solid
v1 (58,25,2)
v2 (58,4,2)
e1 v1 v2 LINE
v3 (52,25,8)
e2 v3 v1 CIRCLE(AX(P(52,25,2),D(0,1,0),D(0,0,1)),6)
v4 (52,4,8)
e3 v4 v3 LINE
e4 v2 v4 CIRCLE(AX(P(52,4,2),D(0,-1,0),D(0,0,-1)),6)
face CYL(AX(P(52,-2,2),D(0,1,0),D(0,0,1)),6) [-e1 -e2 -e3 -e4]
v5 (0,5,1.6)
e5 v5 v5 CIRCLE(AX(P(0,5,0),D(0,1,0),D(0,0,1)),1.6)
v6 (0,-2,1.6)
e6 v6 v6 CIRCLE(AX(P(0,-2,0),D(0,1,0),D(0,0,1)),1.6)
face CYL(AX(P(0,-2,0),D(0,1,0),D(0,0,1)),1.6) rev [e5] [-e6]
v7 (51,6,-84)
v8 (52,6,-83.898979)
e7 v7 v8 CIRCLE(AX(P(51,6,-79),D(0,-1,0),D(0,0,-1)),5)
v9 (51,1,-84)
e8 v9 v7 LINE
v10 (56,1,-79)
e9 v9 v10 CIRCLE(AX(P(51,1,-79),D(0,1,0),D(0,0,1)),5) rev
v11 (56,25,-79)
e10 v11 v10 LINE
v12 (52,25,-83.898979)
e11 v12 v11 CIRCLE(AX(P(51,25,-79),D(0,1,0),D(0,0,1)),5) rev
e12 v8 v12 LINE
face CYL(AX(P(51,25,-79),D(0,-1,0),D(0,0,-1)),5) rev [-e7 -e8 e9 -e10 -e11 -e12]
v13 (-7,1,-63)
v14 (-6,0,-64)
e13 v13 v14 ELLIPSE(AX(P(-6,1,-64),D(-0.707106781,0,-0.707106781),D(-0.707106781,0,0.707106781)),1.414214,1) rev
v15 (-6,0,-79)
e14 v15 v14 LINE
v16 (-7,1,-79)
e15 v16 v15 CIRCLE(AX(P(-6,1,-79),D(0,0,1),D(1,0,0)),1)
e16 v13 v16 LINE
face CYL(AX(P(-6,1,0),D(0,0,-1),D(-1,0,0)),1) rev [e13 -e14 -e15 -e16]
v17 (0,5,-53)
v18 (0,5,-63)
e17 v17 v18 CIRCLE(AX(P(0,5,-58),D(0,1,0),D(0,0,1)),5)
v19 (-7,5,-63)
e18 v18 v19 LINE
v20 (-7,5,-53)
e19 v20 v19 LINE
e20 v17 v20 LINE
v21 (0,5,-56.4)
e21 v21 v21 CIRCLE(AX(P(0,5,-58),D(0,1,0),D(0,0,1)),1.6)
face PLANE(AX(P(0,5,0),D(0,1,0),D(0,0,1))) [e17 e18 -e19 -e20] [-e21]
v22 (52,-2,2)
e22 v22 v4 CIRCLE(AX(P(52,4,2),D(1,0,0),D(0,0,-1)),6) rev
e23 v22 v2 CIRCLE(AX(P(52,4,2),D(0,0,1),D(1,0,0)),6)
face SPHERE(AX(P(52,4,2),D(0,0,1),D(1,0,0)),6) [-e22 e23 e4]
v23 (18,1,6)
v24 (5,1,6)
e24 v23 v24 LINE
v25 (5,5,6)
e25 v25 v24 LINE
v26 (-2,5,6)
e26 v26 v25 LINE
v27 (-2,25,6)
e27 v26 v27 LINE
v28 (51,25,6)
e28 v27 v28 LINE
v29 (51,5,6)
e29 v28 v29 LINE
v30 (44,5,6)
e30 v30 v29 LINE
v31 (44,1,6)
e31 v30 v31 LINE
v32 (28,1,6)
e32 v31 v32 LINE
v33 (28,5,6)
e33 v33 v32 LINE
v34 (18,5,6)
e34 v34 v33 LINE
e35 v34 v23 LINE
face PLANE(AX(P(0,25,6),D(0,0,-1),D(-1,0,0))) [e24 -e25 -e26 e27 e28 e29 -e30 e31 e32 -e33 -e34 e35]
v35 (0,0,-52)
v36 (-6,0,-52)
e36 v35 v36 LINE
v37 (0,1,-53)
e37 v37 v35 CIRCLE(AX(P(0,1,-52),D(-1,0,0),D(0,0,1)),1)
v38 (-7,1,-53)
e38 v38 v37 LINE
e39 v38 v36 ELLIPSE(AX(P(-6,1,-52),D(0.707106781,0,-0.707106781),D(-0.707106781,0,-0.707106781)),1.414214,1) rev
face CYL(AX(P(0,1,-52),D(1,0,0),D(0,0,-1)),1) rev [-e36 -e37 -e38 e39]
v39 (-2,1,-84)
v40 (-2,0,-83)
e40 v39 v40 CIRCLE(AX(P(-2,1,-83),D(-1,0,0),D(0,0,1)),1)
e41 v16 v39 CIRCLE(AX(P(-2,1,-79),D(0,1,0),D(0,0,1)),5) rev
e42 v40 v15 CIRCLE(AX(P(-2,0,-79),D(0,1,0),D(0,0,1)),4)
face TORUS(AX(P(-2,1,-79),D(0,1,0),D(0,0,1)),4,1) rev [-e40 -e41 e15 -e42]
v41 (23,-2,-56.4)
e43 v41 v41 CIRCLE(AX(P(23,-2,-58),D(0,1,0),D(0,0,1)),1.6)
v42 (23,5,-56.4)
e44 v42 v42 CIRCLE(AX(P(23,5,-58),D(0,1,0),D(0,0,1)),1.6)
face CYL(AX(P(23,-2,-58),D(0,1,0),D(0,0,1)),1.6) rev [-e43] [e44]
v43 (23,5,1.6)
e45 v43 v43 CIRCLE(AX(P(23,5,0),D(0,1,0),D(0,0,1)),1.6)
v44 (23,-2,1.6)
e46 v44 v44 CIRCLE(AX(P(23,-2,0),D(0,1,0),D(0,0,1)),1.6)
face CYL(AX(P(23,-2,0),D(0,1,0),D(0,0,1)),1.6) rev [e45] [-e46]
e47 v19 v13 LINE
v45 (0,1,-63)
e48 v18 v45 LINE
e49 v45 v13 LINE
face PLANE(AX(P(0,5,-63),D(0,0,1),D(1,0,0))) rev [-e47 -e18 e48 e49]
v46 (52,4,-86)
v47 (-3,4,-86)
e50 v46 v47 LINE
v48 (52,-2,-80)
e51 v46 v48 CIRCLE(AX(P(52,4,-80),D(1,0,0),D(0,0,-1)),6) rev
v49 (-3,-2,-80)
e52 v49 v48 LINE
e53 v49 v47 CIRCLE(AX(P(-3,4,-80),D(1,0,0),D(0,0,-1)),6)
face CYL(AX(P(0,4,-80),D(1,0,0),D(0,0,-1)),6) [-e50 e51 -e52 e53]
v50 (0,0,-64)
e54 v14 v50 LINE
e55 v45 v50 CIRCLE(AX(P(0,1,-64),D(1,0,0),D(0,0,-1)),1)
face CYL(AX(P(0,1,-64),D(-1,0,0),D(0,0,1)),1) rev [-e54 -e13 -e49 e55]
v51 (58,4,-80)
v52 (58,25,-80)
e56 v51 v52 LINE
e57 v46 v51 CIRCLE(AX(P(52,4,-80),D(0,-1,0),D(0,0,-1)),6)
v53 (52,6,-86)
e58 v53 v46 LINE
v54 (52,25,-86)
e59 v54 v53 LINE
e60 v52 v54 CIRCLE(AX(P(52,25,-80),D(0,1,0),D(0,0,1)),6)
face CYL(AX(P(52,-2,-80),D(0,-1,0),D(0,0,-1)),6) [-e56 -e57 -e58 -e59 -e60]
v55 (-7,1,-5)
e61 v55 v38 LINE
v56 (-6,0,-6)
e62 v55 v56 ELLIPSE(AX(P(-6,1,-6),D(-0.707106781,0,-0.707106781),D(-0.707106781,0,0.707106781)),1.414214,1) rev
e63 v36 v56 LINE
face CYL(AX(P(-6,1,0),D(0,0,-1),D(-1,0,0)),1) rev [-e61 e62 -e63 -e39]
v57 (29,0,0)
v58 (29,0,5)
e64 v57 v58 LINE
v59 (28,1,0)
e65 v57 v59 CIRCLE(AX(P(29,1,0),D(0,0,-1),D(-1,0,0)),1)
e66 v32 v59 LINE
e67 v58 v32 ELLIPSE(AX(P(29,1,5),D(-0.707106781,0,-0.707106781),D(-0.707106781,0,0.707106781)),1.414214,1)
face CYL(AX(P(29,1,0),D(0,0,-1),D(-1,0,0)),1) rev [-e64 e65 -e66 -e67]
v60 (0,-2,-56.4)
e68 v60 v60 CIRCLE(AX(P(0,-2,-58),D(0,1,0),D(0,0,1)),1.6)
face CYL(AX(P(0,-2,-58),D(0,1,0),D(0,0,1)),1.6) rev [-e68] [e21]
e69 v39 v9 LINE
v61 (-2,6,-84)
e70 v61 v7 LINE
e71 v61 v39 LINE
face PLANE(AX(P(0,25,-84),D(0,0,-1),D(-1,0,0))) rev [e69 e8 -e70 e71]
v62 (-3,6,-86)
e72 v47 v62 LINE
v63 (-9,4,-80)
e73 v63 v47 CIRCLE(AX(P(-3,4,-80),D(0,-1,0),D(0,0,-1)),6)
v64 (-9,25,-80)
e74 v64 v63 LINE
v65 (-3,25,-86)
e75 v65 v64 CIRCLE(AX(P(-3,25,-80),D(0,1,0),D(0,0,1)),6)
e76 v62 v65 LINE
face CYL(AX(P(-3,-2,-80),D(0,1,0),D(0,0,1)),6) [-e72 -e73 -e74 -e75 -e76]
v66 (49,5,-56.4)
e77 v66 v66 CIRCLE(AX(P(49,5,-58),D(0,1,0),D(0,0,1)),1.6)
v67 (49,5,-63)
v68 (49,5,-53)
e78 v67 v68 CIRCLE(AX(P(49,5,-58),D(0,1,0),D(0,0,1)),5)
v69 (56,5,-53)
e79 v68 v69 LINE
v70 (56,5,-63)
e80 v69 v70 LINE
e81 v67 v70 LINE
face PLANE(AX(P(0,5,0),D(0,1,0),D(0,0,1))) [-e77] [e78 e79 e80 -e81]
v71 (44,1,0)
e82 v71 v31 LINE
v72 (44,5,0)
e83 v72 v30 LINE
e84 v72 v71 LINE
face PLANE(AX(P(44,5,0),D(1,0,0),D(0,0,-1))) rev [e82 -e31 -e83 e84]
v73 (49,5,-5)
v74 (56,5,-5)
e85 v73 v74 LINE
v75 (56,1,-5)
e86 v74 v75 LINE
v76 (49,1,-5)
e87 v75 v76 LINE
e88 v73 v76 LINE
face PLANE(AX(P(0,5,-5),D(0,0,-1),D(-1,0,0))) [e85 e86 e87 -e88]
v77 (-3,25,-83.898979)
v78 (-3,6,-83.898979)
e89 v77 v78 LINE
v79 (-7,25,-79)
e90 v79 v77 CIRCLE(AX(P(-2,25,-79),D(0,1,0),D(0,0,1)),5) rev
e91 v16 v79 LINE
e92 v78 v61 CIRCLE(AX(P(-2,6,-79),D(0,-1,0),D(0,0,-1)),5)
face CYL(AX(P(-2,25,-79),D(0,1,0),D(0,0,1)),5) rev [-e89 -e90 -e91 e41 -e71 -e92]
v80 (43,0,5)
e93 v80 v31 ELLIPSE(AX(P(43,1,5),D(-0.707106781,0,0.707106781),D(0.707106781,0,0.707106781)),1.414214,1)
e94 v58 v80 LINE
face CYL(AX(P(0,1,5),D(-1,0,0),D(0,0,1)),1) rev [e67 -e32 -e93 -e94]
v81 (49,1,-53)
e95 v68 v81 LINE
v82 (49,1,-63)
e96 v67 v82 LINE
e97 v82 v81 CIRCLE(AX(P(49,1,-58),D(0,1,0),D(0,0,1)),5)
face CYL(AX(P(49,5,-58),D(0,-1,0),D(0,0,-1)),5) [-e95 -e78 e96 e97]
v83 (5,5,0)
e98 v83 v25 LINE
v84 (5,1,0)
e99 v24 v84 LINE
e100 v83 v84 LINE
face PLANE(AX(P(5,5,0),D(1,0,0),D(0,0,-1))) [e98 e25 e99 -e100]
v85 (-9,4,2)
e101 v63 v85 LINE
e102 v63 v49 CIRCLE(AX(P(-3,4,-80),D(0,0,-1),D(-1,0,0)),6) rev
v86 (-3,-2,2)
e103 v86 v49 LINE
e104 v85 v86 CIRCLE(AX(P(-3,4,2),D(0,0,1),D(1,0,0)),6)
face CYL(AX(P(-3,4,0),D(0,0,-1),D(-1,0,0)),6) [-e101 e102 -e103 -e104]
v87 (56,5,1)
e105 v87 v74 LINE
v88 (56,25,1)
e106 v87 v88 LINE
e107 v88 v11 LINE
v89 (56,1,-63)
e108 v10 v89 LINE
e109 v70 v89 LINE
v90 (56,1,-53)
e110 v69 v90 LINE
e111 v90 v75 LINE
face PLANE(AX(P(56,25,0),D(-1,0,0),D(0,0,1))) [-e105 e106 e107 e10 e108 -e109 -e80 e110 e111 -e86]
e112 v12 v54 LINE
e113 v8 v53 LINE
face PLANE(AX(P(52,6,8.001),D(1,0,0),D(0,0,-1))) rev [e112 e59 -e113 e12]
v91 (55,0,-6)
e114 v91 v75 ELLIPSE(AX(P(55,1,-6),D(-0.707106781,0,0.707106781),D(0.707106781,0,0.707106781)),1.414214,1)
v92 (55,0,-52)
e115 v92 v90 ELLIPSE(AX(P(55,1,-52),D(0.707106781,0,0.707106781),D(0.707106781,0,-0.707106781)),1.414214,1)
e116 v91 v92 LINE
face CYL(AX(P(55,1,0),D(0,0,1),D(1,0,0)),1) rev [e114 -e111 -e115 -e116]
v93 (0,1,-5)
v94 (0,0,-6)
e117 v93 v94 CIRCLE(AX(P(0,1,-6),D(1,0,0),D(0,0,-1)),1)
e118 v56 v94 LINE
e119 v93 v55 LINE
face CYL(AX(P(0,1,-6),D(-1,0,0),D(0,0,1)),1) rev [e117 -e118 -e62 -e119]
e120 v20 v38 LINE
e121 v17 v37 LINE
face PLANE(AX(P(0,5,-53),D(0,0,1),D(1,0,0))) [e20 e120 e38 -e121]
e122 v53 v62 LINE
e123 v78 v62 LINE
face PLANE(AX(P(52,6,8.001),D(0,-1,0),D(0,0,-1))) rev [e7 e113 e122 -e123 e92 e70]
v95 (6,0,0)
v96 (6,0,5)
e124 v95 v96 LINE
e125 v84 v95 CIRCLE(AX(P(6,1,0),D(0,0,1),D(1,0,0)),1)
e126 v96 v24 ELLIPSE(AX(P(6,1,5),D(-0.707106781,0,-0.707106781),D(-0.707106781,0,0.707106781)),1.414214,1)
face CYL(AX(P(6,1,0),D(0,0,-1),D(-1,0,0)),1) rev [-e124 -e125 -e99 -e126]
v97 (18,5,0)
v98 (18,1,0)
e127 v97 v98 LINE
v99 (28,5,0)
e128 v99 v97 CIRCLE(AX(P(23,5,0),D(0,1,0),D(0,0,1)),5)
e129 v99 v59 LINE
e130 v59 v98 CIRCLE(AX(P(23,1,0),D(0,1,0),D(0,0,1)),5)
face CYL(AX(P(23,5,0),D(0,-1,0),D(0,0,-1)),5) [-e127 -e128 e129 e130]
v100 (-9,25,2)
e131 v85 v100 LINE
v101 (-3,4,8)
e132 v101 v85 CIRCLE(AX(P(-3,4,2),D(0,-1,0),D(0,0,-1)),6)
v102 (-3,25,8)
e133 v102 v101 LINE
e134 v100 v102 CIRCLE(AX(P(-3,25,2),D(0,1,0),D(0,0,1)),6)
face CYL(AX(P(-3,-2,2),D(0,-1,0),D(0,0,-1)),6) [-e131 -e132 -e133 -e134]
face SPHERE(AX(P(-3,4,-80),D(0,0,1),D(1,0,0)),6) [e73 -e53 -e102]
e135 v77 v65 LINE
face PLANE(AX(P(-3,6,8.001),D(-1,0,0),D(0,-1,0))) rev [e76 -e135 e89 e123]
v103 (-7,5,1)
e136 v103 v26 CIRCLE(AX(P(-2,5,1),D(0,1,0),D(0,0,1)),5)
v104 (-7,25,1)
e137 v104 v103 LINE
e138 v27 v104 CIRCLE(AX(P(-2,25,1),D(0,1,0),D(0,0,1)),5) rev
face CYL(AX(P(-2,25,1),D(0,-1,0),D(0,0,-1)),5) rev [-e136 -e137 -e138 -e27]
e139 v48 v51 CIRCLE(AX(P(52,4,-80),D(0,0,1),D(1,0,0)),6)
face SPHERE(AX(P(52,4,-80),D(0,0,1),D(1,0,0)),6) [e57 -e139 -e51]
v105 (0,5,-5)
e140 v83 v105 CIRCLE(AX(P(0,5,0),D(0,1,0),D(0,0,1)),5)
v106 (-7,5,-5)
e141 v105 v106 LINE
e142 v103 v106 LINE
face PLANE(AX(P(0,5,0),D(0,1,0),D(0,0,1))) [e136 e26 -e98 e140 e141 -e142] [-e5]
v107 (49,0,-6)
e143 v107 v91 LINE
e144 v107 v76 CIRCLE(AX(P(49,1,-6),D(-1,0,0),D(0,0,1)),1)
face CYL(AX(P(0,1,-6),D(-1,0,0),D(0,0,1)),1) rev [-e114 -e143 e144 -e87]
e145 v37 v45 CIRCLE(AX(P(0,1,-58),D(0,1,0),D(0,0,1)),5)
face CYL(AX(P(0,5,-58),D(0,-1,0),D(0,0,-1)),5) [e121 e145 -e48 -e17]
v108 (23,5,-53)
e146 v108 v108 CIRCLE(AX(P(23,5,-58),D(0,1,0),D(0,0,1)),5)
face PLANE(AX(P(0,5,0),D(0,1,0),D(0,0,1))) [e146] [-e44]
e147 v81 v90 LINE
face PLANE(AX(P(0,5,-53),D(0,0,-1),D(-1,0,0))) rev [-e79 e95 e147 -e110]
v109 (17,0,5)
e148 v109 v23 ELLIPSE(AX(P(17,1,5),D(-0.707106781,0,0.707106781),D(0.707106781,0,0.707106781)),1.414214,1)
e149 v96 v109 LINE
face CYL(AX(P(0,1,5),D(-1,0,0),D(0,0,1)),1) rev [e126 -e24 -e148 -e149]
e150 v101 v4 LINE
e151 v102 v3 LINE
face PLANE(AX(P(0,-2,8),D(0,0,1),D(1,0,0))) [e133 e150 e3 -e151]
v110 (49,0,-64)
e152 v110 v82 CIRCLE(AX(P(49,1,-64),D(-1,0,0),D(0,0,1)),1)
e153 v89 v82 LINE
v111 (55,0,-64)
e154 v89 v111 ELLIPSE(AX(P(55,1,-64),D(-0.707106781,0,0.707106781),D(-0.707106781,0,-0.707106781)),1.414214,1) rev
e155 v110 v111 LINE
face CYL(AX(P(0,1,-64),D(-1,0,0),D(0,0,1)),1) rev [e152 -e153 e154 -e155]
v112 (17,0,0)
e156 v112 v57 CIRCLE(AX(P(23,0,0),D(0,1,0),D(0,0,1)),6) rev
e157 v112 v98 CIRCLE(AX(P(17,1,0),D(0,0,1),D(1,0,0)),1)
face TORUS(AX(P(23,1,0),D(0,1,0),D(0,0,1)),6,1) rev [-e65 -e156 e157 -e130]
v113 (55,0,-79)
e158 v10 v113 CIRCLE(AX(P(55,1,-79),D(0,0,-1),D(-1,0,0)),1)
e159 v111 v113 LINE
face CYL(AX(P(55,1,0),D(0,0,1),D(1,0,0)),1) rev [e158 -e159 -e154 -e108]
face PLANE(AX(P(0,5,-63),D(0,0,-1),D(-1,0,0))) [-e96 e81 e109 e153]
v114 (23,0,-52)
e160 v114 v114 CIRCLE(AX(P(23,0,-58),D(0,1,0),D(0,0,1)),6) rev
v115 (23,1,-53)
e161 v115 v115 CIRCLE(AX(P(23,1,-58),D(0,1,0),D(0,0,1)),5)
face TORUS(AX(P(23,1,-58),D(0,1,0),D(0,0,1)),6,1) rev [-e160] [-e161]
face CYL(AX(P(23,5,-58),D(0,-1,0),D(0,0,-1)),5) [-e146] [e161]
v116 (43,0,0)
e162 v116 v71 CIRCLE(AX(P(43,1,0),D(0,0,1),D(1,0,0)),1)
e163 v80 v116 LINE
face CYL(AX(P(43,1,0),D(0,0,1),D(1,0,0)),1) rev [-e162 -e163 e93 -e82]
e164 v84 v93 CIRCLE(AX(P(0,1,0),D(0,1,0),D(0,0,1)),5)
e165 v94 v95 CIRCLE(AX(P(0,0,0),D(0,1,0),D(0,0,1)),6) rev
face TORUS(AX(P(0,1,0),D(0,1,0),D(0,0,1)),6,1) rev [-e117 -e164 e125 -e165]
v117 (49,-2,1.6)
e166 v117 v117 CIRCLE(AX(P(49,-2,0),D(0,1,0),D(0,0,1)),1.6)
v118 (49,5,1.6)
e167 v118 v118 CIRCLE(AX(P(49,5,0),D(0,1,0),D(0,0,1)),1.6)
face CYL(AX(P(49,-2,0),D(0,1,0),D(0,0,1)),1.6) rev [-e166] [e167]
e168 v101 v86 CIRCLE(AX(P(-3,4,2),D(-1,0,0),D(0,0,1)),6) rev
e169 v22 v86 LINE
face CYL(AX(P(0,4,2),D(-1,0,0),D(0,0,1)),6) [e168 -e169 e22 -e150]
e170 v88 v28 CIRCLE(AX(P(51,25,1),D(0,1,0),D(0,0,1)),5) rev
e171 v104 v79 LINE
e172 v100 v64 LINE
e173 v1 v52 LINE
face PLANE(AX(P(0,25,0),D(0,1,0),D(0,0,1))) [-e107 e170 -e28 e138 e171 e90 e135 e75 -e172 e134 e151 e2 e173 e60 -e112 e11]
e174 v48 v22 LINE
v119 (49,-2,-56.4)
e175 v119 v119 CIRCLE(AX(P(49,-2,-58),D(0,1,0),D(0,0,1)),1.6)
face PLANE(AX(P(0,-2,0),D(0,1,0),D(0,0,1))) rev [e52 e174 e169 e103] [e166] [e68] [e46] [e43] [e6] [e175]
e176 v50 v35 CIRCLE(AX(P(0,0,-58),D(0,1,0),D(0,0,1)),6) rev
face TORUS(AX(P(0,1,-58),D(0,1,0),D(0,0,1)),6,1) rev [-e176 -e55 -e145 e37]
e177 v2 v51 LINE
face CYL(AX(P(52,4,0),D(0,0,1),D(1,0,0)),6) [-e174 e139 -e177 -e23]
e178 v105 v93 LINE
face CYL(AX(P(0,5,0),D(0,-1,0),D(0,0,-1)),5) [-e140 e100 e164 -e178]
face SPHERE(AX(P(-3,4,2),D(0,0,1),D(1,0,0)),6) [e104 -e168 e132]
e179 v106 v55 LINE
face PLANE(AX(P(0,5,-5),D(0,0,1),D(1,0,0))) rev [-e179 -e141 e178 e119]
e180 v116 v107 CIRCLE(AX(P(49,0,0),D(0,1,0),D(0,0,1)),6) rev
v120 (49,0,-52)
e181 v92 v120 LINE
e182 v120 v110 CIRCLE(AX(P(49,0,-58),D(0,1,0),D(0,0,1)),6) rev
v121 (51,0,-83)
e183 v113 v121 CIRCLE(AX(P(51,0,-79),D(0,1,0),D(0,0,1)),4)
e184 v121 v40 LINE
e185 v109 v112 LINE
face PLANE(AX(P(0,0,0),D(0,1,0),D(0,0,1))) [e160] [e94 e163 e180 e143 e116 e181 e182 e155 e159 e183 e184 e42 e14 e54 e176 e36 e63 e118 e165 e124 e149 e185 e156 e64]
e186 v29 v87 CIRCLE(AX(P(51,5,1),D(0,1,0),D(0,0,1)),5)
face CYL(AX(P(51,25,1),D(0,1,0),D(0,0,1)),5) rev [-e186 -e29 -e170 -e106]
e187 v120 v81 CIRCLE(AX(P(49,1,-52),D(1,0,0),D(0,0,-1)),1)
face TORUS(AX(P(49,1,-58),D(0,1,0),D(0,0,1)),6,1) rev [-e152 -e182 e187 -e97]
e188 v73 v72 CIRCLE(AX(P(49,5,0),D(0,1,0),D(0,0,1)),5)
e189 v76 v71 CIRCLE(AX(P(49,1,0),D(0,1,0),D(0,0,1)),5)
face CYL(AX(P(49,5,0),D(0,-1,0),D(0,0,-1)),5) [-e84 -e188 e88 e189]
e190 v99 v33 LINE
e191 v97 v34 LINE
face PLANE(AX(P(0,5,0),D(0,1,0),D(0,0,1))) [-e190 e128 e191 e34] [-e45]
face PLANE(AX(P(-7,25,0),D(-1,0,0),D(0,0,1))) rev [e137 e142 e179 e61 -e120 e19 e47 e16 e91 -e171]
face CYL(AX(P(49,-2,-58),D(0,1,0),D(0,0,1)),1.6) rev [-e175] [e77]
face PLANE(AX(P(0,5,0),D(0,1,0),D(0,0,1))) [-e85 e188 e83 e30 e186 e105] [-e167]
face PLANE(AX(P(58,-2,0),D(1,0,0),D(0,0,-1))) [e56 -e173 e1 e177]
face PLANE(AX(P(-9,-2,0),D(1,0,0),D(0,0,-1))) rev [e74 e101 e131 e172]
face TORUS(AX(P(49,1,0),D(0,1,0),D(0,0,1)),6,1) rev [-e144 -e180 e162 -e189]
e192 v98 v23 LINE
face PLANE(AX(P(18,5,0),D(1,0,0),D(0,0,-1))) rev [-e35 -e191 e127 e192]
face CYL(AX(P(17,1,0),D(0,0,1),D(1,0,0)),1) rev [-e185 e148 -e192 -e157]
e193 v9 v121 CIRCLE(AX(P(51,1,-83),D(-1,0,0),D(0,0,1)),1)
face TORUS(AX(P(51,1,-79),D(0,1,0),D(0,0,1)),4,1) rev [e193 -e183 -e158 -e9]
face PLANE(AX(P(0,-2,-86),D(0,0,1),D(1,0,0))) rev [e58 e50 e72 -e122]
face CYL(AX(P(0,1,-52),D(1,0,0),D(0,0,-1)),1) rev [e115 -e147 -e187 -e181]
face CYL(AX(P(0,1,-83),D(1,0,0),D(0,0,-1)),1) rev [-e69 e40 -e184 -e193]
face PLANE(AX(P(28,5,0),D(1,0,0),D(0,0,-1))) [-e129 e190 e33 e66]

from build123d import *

# Parameters (mm, degrees)
SKETCH_1_W          = 67
SKETCH_1_H          = 94
SKETCH_1_R          = 1.6
EXTRUDE_1_DEPTH     = 2
SKETCH_1_3_W        = 67
SKETCH_1_3_H        = 94
SKETCH_1_3_W_2      = 63
SKETCH_1_3_H_2      = 90
EXTRUDE_2_DEPTH     = 25
EXTRUDE_START       = 5
SKETCH_1_4_R        = 1.6
SKETCH_1_4_R_2      = 5
EXTRUDE_3_DEPTH     = 5
CUT_EXTRUDE_1_REACH = 115.248
SKETCH_2_W          = 55
SKETCH_2_H          = 19
FILLET_7_R          = 5
FILLET_8_R          = 1
FILLET_9_R          = 6
FILLET_11_R         = 6


with BuildPart() as part:
    # Эскиз1 → Бобышка-Вытянуть1 (new body)
    with BuildSketch(Plane(origin=(0, 0, 0), x_dir=(1, 0, 0), z_dir=(0, 1, 0))):
        with Locations((24.5, 39)):
            Rectangle(SKETCH_1_W, SKETCH_1_H)
        with Locations(Location((0, 0, 0), (0, 0, 270))):
            Circle(SKETCH_1_R, mode=Mode.SUBTRACT)
        with Locations(Location((49, 0, 0), (0, 0, 270))):
            Circle(SKETCH_1_R, mode=Mode.SUBTRACT)
        with Locations(Location((49, 58, 0), (0, 0, 270))):
            Circle(SKETCH_1_R, mode=Mode.SUBTRACT)
        with Locations(Location((0, 58, 0), (0, 0, 270))):
            Circle(SKETCH_1_R, mode=Mode.SUBTRACT)
        with Locations(Location((23, 58, 0), (0, 0, 270))):
            Circle(SKETCH_1_R, mode=Mode.SUBTRACT)
        with Locations(Location((23, 0, 0), (0, 0, 270))):
            Circle(SKETCH_1_R, mode=Mode.SUBTRACT)
    extrude(amount=-EXTRUDE_1_DEPTH)

    # Эскиз1<3> → Бобышка-Вытянуть2 (add)
    with BuildSketch(Plane(origin=(0, 0, 0), x_dir=(1, 0, 0), z_dir=(0, 1, 0))):
        with Locations((24.5, 39)):
            Rectangle(SKETCH_1_3_W, SKETCH_1_3_H)
        with Locations((24.5, 39)):
            Rectangle(SKETCH_1_3_W_2, SKETCH_1_3_H_2, mode=Mode.SUBTRACT)
    extrude(amount=EXTRUDE_2_DEPTH)

    # Эскиз1<4> → Бобышка-Вытянуть3 (add)
    # profile 1 of 6: a face of its own
    with BuildSketch(Plane(origin=(0, 0, 0), x_dir=(1, 0, 0), z_dir=(0, 1, 0)).offset(EXTRUDE_START)):
        with BuildLine():
            Line((-7, 5), (-7, -6))
            Line((-7, -6), (5, -6))
            Line((5, -6), (5, 0))
            ThreePointArc((5, 0), (3.535533906, 3.535533906), (0, 5))
            Line((0, 5), (-7, 5))
        make_face()
        with Locations(Location((0, 0, 0), (0, 0, 270))):
            Circle(SKETCH_1_4_R, mode=Mode.SUBTRACT)
    # profile 2 of 6: a face of its own
    with BuildSketch(Plane(origin=(0, 0, 0), x_dir=(1, 0, 0), z_dir=(0, 1, 0)).offset(EXTRUDE_START)):
        with BuildLine():
            Line((18, 0), (18, -6))
            Line((18, -6), (28, -6))
            Line((28, -6), (28, 0))
            ThreePointArc((28, 0), (23, 5), (18, 0))
        make_face()
        with Locations(Location((23, 0, 0), (0, 0, 270))):
            Circle(SKETCH_1_4_R, mode=Mode.SUBTRACT)
    # profile 3 of 6: a face of its own
    with BuildSketch(Plane(origin=(0, 0, 0), x_dir=(1, 0, 0), z_dir=(0, 1, 0)).offset(EXTRUDE_START)):
        with BuildLine():
            Line((-7, 63), (-7, 53))
            Line((-7, 53), (0, 53))
            ThreePointArc((0, 53), (5, 58), (0, 63))
            Line((0, 63), (-7, 63))
        make_face()
        with Locations(Location((0, 58, 0), (0, 0, 270))):
            Circle(SKETCH_1_4_R, mode=Mode.SUBTRACT)
    # profile 4 of 6: a face of its own
    with BuildSketch(Plane(origin=(0, 0, 0), x_dir=(1, 0, 0), z_dir=(0, 1, 0)).offset(EXTRUDE_START)):
        with BuildLine():
            Line((44, 0), (44, -6))
            Line((44, -6), (56, -6))
            Line((56, -6), (56, 5))
            Line((56, 5), (49, 5))
            ThreePointArc((49, 5), (45.464466094, 3.535533906), (44, 0))
        make_face()
        with Locations(Location((49, 0, 0), (0, 0, 270))):
            Circle(SKETCH_1_4_R, mode=Mode.SUBTRACT)
    # profile 5 of 6: a face of its own
    with BuildSketch(Plane(origin=(0, 0, 0), x_dir=(1, 0, 0), z_dir=(0, 1, 0)).offset(EXTRUDE_START)):
        with BuildLine():
            Line((56, 53), (56, 63))
            Line((56, 63), (49, 63))
            ThreePointArc((49, 63), (44, 58), (49, 53))
            Line((49, 53), (56, 53))
        make_face()
        with Locations(Location((49, 58, 0), (0, 0, 270))):
            Circle(SKETCH_1_4_R, mode=Mode.SUBTRACT)
    # profile 6 of 6: a face of its own
    with BuildSketch(Plane(origin=(0, 0, 0), x_dir=(1, 0, 0), z_dir=(0, 1, 0)).offset(EXTRUDE_START)):
        with Locations(Location((23, 58, 0), (0, 0, 270))):
            Circle(SKETCH_1_4_R_2)
        with Locations(Location((23, 58, 0), (0, 0, 270))):
            Circle(SKETCH_1_4_R, mode=Mode.SUBTRACT)
    extrude(amount=-EXTRUDE_3_DEPTH)

    # Эскиз2 → Вырез-Вытянуть1 (cut, up to next)
    with BuildSketch(Plane(origin=(0, 0, -86), x_dir=(-1, 0, 0), z_dir=(0, 0, -1)), mode=Mode.PRIVATE) as cut_extrude_1_sk1:
        with Locations((-24.5, 15.5)):
            Rectangle(SKETCH_2_W, SKETCH_2_H)
    cut_extrude_1_tool1 = extrude(cut_extrude_1_sk1.sketch, amount=-CUT_EXTRUDE_1_REACH, mode=Mode.PRIVATE) & part.part
    add(cut_extrude_1_tool1.solids().sort_by_distance((24.5, 15.5, -86))[0], mode=Mode.SUBTRACT)

    # Скругление7
    fillet_7_edges = [part.edges().sort_by_distance(p)[0] for p in [
        (56, 12.5, -84),
        (-7, 12.5, -84),
        (56, 15, 6),
        (-7, 15, 6),
    ]]
    fillet(fillet_7_edges, radius=FILLET_7_R)

    # Скругление8
    fillet_8_edges = [part.edges().sort_by_distance(p)[0] for p in [
        (5, 0, 3),
        (36, 0, 6),
        (23, 0, -5),
        (18, 0, 3),
        (28, 0, 3),
        (56, 0, -29),
        (45.464466094, 0, -3.535533906),
        (44, 0, 3),
        (52.5, 0, -5),
        (24.5, 0, -84),
        (-5.535533906, 0, -82.535533906),
        (54.535533906, 0, -82.535533906),
        (-7, 0, -71),
        (5, 0, -58),
        (-3.5, 0, -63),
        (-3.5, 0, -53),
        (23, 0, -63),
        (56, 0, -71),
        (44, 0, -58),
        (52.5, 0, -53),
        (52.5, 0, -63),
        (-7, 0, -29),
        (11.5, 0, 6),
        (3.535533906, 0, -3.535533906),
        (-3.5, 0, -5),
    ]]
    fillet(fillet_8_edges, radius=FILLET_8_R)

    # Скругление9
    fillet_9_edges = [part.edges().sort_by_distance(p)[0] for p in [
        (58, 11.5, 8),
        (-9, 11.5, 8),
        (-9, -2, -39),
        (24.5, -2, 8),
        (58, -2, -39),
        (24.5, -2, -86),
    ]]
    fillet(fillet_9_edges, radius=FILLET_9_R)

    # Скругление11
    # the kernel refuses this fillet: 6 mm, written as the material it takes off along each edge
    with BuildSketch(Plane(origin=(-3, 4, -80), x_dir=(-1, 0, 0), z_dir=(0, 0, -1))) as fillet_11_piece_1_section:
        Polygon((0, 0), (FILLET_11_R, 0), (FILLET_11_R, -FILLET_11_R), (0, -FILLET_11_R), align=None)
    fillet_11_piece_1 = extrude(amount=FILLET_11_R, mode=Mode.PRIVATE)
    fillet_11_piece_1 = fillet_11_piece_1 - Plane(origin=(-3, 4, -80), x_dir=(0.7071067811865475, 0.7071067811865475, 0), z_dir=(0, 0, -1)) * Sphere(FILLET_11_R, mode=Mode.PRIVATE)
    add(fillet_11_piece_1, mode=Mode.SUBTRACT)
    with BuildSketch(Plane(origin=(52, 4, -80), x_dir=(0, 0, -1), z_dir=(1, 0, 0))) as fillet_11_piece_2_section:
        Polygon((0, 0), (FILLET_11_R, 0), (FILLET_11_R, -FILLET_11_R), (0, -FILLET_11_R), align=None)
    fillet_11_piece_2 = extrude(amount=FILLET_11_R, mode=Mode.PRIVATE)
    fillet_11_piece_2 = fillet_11_piece_2 - Plane(origin=(52, 4, -80), x_dir=(0, 0.7071067811865475, 0.7071067811865475), z_dir=(1, 0, 0)) * Sphere(FILLET_11_R, mode=Mode.PRIVATE)
    add(fillet_11_piece_2, mode=Mode.SUBTRACT)
    with BuildSketch(Plane(origin=(-9, 40, -86), x_dir=(1, 0, 0), z_dir=(0, -1, 0)), Plane(origin=(58, 40, -86), x_dir=(0, 0, 1), z_dir=(0, -1, 0))) as fillet_11_piece_3:
        with BuildLine():
            CenterArc((FILLET_11_R, FILLET_11_R), FILLET_11_R, 180, 90)
            Line((0, FILLET_11_R), (0, 0))
            Line((0, 0), (FILLET_11_R, 0))
        make_face()
    extrude(amount=36, mode=Mode.SUBTRACT)


solid = part.part
